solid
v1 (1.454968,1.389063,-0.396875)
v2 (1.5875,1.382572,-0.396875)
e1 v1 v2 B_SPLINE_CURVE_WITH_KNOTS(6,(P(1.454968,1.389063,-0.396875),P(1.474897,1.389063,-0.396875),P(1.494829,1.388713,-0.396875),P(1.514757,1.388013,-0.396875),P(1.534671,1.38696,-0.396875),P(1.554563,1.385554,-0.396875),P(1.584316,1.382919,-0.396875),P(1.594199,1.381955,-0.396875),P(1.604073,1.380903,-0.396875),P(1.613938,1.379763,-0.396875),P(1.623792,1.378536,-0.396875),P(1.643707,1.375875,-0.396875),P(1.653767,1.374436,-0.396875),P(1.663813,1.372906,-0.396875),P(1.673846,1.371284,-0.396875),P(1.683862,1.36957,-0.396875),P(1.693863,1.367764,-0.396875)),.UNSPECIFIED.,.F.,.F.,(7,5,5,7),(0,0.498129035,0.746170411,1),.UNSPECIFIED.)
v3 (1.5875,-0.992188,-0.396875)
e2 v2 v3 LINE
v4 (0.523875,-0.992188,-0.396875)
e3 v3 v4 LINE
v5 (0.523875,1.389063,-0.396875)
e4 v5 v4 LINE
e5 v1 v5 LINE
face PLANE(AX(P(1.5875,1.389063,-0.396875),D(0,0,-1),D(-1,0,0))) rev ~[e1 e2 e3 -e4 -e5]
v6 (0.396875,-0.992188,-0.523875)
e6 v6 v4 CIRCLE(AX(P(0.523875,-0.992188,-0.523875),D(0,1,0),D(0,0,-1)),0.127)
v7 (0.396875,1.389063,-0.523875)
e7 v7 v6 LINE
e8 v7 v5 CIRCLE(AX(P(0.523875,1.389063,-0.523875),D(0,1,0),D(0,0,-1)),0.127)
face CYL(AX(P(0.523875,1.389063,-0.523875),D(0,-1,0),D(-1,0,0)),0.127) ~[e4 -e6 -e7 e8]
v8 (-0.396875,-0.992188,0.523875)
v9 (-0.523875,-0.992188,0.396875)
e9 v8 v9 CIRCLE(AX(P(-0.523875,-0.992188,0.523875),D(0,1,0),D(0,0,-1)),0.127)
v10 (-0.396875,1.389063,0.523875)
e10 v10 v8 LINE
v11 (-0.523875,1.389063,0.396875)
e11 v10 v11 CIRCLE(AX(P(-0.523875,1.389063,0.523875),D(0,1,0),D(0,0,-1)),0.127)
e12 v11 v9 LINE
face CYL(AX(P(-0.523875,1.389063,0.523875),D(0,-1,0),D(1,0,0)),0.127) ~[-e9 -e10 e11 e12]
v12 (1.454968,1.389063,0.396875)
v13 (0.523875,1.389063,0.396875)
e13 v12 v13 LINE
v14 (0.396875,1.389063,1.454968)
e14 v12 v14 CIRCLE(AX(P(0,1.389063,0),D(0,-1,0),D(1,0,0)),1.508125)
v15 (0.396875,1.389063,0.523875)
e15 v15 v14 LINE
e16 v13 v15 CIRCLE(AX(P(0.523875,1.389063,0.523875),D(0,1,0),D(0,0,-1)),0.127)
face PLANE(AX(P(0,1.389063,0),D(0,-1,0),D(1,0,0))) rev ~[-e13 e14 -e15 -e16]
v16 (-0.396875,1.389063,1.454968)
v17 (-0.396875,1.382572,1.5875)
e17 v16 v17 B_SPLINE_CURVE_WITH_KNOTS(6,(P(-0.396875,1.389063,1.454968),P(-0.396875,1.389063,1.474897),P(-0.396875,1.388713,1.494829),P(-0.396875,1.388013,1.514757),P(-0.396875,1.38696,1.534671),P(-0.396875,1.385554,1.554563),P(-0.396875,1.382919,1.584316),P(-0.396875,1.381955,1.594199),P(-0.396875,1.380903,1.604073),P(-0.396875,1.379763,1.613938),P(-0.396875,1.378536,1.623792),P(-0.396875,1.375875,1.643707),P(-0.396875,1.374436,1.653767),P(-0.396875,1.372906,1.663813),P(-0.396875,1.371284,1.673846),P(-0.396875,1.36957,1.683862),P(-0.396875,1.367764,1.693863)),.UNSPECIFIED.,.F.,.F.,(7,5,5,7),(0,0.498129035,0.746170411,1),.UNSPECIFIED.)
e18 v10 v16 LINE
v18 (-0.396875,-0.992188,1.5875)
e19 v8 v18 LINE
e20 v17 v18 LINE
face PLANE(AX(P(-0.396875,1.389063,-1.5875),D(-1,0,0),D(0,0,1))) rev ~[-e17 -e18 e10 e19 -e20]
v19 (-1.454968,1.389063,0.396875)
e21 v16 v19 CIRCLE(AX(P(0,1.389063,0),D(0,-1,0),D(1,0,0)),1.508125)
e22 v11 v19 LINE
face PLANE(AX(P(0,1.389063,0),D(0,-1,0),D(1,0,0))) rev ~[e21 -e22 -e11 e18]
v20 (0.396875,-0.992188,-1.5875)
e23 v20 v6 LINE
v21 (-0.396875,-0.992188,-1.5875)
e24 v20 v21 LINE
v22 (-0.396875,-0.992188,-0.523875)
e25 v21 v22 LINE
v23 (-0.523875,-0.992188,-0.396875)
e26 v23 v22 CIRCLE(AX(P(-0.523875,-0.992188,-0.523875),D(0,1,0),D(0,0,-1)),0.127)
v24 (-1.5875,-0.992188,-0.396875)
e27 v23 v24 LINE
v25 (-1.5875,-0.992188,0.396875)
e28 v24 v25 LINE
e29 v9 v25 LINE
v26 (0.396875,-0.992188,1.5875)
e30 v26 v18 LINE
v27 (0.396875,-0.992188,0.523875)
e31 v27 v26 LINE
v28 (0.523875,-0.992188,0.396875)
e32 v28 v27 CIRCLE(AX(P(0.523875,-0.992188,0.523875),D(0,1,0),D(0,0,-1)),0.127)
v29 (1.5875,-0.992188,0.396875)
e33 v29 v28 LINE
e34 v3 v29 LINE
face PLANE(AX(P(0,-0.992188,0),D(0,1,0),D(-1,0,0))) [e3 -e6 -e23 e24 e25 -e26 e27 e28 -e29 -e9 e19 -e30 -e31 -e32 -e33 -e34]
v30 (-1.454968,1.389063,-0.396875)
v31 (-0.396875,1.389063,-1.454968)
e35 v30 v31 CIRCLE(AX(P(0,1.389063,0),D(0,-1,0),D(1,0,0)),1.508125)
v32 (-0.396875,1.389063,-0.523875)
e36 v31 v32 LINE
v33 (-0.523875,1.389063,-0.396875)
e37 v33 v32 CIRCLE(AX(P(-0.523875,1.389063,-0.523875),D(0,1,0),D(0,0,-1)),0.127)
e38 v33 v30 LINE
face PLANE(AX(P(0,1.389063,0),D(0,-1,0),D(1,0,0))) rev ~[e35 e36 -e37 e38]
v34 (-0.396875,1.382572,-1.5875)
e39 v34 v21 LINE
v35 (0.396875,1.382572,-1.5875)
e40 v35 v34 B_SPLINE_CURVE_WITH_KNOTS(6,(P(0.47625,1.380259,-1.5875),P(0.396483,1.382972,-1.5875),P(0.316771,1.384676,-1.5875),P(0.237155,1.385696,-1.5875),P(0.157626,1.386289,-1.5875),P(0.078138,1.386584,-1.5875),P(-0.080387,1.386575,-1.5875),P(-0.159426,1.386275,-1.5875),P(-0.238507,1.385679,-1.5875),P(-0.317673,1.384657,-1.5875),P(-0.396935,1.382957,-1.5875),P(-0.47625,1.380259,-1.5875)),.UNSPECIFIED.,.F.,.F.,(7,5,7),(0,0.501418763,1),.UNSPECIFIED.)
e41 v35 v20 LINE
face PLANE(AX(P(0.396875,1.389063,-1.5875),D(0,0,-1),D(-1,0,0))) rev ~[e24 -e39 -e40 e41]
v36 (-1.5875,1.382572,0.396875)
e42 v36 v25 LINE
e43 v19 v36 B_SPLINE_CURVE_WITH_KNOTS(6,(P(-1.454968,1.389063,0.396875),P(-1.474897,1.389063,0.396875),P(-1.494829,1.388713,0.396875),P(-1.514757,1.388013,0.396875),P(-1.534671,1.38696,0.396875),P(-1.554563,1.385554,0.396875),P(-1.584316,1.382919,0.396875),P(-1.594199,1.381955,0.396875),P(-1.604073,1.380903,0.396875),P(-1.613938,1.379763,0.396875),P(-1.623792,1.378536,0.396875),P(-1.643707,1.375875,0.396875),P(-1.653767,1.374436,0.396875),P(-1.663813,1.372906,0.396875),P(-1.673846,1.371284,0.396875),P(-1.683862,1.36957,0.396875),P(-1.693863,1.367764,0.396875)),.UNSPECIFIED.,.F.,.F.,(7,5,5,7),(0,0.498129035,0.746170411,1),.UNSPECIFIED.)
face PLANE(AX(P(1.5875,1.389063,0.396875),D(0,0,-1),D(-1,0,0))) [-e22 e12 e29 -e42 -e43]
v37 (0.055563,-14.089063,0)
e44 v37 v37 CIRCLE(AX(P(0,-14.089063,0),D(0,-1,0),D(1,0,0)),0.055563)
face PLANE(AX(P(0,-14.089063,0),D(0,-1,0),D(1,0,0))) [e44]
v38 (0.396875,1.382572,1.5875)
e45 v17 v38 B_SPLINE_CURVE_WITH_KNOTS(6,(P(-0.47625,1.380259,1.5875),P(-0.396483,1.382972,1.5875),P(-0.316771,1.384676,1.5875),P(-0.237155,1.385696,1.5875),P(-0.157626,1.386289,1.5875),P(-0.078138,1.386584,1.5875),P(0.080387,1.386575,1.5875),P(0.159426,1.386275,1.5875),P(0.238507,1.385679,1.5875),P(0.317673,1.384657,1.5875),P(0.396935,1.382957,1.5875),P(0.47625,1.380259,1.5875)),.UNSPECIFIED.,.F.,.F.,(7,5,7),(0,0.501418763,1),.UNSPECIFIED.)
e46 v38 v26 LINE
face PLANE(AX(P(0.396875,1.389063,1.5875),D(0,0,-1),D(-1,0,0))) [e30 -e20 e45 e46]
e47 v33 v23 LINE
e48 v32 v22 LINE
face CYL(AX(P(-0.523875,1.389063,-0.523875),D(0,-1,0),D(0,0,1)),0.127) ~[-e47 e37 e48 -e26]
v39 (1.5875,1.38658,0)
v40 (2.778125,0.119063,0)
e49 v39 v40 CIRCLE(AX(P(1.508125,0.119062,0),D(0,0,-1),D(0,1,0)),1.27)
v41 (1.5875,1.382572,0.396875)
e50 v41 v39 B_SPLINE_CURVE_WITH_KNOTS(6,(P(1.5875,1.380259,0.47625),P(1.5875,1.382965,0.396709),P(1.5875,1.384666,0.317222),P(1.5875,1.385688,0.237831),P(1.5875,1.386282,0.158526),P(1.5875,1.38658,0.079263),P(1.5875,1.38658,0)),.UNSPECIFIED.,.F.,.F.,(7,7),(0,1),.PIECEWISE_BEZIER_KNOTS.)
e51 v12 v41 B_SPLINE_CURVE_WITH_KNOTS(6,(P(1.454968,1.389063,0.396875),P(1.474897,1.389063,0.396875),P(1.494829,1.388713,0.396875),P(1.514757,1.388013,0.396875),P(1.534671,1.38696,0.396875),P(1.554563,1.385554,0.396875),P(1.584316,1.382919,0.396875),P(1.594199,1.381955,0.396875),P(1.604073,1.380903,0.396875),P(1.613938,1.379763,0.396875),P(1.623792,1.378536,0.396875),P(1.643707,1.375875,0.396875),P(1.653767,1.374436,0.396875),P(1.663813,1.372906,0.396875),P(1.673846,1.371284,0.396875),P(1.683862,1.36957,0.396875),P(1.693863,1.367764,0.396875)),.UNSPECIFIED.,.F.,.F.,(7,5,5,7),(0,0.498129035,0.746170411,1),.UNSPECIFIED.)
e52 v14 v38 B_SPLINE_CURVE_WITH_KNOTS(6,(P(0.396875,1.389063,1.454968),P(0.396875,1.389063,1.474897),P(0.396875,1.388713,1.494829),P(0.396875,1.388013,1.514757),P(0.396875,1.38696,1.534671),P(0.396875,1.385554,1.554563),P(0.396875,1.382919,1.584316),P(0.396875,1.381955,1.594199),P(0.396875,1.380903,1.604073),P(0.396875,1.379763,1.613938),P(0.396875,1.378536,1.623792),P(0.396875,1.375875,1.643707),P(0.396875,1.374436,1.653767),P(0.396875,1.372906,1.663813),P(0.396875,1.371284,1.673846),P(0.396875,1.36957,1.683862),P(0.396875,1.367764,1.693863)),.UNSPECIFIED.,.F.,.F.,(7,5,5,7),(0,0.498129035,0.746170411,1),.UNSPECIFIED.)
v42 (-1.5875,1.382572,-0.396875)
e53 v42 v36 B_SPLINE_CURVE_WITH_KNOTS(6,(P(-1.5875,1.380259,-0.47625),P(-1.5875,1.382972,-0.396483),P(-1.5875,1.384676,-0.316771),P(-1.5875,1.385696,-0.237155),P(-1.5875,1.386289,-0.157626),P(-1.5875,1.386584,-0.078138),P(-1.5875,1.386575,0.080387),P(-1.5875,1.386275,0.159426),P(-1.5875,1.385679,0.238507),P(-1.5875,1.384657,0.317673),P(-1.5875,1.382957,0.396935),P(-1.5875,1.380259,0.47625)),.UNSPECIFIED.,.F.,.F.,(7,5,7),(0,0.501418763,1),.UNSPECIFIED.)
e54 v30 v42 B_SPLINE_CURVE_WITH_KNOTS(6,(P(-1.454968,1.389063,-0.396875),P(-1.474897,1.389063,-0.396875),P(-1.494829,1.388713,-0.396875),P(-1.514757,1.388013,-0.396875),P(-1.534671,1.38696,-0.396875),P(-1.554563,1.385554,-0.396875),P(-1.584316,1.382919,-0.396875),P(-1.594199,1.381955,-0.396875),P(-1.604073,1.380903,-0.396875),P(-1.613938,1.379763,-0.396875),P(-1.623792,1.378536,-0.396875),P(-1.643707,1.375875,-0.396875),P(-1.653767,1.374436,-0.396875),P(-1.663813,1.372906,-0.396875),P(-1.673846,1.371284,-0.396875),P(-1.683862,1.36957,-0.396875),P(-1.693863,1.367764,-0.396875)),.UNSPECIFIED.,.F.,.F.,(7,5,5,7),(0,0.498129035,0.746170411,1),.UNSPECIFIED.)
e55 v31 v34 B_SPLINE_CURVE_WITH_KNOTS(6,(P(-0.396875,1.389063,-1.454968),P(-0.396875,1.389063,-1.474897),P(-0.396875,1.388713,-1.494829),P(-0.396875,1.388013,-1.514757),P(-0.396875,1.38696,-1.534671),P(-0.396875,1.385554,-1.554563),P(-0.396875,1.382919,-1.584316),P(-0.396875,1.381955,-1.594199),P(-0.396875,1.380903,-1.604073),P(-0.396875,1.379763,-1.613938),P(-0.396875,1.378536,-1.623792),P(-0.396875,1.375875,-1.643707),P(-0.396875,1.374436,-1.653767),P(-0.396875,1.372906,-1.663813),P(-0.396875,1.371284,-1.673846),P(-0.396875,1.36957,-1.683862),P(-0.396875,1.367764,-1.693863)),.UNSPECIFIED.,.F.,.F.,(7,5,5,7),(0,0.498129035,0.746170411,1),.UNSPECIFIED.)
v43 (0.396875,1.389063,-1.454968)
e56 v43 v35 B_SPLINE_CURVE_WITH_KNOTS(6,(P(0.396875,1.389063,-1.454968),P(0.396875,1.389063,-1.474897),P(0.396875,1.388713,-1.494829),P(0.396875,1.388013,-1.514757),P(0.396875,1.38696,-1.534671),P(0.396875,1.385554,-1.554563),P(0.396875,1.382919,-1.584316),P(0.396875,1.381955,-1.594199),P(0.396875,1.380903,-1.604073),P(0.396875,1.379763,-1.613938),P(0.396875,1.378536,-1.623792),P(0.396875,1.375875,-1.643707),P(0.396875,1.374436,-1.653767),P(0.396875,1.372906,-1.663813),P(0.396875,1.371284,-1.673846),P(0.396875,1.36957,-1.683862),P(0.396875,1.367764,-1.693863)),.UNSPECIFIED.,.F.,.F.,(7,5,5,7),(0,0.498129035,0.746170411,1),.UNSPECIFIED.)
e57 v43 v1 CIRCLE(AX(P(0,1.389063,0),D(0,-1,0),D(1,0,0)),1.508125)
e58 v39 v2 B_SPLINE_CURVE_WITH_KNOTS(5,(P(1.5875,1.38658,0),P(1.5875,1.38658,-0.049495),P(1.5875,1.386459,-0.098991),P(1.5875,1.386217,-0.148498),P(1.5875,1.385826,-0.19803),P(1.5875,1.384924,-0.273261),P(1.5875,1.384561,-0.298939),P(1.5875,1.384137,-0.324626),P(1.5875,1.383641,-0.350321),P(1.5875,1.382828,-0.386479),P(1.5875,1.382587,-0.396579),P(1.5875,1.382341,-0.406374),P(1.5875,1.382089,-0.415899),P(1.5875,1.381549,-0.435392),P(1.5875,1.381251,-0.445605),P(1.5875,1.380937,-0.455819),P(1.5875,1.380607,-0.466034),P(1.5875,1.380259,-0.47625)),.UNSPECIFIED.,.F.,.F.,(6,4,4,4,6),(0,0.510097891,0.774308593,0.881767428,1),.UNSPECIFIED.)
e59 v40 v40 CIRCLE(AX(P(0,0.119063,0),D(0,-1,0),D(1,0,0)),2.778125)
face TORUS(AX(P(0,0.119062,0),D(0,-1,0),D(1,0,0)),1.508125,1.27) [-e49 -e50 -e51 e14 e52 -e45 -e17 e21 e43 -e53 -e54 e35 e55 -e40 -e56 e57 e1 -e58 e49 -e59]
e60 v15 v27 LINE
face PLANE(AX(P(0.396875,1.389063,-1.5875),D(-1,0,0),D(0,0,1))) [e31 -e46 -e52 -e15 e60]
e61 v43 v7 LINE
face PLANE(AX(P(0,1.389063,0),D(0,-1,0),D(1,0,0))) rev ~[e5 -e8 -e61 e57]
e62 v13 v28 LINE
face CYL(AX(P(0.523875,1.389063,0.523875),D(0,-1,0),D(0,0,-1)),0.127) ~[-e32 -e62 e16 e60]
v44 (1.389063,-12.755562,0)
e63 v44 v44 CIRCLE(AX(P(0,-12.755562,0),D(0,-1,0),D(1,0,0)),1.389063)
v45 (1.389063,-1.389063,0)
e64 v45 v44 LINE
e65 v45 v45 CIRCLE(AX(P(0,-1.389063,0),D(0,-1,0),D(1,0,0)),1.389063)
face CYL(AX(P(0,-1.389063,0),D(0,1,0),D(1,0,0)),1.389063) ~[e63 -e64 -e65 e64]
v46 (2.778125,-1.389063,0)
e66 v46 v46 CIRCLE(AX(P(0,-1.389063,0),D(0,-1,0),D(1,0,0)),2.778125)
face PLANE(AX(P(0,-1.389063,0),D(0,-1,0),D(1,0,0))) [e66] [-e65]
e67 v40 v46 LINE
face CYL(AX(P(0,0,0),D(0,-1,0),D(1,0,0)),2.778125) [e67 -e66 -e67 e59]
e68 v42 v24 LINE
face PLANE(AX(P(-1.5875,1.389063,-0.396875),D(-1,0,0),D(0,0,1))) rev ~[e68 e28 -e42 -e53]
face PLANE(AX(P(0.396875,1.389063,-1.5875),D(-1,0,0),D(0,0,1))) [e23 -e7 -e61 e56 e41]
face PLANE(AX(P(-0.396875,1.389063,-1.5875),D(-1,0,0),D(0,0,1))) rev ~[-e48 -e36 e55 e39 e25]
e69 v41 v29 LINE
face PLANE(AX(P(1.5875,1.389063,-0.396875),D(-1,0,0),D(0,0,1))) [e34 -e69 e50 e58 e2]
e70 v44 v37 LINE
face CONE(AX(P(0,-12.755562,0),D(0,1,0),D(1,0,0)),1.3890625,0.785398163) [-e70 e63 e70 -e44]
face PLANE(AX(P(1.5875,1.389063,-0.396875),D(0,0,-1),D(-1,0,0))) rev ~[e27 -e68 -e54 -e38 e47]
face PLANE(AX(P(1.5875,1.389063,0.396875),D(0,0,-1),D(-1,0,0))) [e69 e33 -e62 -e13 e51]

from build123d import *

# Parameters (mm, degrees)
F0_R     = 2.778125
F1_DEPTH = 1.3890625
F2_R     = 1.3890625
F3_DEPTH = 12.7
F4_W     = 0.79375
F4_H     = 3.175
F6_DEPTH = 2.38125
F5_W     = 3.175
F5_H     = 0.79375
F7_DEPTH = 2.38125
F8_R     = 0.127
F10_SIZE = 1.3335


# Not quite as in the source:
# - a fillet or chamfer that OpenCascade refuses, or shapes differently, is made with other operations: its cross-section is extruded or revolved along the edge and cut away or added


with BuildPart() as f1:
    # F0 (on Front) → F1 (new body, symmetric)
    with BuildSketch(Plane.XZ):
        Circle(F0_R)
    extrude(amount=F1_DEPTH, both=True)

    # F2 (on face) → F3 (join)
    with BuildSketch(Plane.XZ.offset(1.3890625)):
        Circle(F2_R)
    extrude(amount=F3_DEPTH)

    # F4 (on face) → F6 (cut)
    with BuildSketch(Plane(origin=(0, 1.3890625, 0), x_dir=(-1, 0, 0), z_dir=(0, 1, 0))):
        Rectangle(F4_W, F4_H)
    extrude(amount=-F6_DEPTH, mode=Mode.SUBTRACT)

    # F5 (on face) → F7 (cut)
    with BuildSketch(Plane(origin=(0, 1.3890625, 0), x_dir=(-1, 0, 0), z_dir=(0, 1, 0))):
        Rectangle(F5_W, F5_H)
    extrude(amount=-F7_DEPTH, mode=Mode.SUBTRACT)

    # F8
    f8_edges = [f1.edges().sort_by_distance(p)[0] for p in [
        (0.396875, 0.198438, 0.396875),
        (-0.396875, 0.198438, 0.396875),
        (-0.396875, 0.198438, -0.396875),
        (0.396875, 0.198438, -0.396875),
    ]]
    fillet(f8_edges, radius=F8_R)

    # F9: fillet of radius 1.27 on 1 edges, made by hand

    # F9_s1 → F9_t2 (revolve, cut)
    with BuildSketch(Plane.XY):
        with BuildLine():
            ThreePointArc((1.508125, 1.3890625), (2.4061506121, 1.0170881121), (2.778125, 0.1190625))
            Line((2.778125, 0.1190625), (2.778125, 1.3890625))
            Line((2.778125, 1.3890625), (1.508125, 1.3890625))
        make_face()
    revolve(axis=Axis((0, 1.3890625, 0), (0, -1, 0)), mode=Mode.SUBTRACT)

    # F10
    f10_edges = [f1.edges().sort_by_distance(p)[0] for p in [
        (-1.389062, -14.089062, 0),
    ]]
    chamfer(f10_edges, length=F10_SIZE)


solid = f1.part
